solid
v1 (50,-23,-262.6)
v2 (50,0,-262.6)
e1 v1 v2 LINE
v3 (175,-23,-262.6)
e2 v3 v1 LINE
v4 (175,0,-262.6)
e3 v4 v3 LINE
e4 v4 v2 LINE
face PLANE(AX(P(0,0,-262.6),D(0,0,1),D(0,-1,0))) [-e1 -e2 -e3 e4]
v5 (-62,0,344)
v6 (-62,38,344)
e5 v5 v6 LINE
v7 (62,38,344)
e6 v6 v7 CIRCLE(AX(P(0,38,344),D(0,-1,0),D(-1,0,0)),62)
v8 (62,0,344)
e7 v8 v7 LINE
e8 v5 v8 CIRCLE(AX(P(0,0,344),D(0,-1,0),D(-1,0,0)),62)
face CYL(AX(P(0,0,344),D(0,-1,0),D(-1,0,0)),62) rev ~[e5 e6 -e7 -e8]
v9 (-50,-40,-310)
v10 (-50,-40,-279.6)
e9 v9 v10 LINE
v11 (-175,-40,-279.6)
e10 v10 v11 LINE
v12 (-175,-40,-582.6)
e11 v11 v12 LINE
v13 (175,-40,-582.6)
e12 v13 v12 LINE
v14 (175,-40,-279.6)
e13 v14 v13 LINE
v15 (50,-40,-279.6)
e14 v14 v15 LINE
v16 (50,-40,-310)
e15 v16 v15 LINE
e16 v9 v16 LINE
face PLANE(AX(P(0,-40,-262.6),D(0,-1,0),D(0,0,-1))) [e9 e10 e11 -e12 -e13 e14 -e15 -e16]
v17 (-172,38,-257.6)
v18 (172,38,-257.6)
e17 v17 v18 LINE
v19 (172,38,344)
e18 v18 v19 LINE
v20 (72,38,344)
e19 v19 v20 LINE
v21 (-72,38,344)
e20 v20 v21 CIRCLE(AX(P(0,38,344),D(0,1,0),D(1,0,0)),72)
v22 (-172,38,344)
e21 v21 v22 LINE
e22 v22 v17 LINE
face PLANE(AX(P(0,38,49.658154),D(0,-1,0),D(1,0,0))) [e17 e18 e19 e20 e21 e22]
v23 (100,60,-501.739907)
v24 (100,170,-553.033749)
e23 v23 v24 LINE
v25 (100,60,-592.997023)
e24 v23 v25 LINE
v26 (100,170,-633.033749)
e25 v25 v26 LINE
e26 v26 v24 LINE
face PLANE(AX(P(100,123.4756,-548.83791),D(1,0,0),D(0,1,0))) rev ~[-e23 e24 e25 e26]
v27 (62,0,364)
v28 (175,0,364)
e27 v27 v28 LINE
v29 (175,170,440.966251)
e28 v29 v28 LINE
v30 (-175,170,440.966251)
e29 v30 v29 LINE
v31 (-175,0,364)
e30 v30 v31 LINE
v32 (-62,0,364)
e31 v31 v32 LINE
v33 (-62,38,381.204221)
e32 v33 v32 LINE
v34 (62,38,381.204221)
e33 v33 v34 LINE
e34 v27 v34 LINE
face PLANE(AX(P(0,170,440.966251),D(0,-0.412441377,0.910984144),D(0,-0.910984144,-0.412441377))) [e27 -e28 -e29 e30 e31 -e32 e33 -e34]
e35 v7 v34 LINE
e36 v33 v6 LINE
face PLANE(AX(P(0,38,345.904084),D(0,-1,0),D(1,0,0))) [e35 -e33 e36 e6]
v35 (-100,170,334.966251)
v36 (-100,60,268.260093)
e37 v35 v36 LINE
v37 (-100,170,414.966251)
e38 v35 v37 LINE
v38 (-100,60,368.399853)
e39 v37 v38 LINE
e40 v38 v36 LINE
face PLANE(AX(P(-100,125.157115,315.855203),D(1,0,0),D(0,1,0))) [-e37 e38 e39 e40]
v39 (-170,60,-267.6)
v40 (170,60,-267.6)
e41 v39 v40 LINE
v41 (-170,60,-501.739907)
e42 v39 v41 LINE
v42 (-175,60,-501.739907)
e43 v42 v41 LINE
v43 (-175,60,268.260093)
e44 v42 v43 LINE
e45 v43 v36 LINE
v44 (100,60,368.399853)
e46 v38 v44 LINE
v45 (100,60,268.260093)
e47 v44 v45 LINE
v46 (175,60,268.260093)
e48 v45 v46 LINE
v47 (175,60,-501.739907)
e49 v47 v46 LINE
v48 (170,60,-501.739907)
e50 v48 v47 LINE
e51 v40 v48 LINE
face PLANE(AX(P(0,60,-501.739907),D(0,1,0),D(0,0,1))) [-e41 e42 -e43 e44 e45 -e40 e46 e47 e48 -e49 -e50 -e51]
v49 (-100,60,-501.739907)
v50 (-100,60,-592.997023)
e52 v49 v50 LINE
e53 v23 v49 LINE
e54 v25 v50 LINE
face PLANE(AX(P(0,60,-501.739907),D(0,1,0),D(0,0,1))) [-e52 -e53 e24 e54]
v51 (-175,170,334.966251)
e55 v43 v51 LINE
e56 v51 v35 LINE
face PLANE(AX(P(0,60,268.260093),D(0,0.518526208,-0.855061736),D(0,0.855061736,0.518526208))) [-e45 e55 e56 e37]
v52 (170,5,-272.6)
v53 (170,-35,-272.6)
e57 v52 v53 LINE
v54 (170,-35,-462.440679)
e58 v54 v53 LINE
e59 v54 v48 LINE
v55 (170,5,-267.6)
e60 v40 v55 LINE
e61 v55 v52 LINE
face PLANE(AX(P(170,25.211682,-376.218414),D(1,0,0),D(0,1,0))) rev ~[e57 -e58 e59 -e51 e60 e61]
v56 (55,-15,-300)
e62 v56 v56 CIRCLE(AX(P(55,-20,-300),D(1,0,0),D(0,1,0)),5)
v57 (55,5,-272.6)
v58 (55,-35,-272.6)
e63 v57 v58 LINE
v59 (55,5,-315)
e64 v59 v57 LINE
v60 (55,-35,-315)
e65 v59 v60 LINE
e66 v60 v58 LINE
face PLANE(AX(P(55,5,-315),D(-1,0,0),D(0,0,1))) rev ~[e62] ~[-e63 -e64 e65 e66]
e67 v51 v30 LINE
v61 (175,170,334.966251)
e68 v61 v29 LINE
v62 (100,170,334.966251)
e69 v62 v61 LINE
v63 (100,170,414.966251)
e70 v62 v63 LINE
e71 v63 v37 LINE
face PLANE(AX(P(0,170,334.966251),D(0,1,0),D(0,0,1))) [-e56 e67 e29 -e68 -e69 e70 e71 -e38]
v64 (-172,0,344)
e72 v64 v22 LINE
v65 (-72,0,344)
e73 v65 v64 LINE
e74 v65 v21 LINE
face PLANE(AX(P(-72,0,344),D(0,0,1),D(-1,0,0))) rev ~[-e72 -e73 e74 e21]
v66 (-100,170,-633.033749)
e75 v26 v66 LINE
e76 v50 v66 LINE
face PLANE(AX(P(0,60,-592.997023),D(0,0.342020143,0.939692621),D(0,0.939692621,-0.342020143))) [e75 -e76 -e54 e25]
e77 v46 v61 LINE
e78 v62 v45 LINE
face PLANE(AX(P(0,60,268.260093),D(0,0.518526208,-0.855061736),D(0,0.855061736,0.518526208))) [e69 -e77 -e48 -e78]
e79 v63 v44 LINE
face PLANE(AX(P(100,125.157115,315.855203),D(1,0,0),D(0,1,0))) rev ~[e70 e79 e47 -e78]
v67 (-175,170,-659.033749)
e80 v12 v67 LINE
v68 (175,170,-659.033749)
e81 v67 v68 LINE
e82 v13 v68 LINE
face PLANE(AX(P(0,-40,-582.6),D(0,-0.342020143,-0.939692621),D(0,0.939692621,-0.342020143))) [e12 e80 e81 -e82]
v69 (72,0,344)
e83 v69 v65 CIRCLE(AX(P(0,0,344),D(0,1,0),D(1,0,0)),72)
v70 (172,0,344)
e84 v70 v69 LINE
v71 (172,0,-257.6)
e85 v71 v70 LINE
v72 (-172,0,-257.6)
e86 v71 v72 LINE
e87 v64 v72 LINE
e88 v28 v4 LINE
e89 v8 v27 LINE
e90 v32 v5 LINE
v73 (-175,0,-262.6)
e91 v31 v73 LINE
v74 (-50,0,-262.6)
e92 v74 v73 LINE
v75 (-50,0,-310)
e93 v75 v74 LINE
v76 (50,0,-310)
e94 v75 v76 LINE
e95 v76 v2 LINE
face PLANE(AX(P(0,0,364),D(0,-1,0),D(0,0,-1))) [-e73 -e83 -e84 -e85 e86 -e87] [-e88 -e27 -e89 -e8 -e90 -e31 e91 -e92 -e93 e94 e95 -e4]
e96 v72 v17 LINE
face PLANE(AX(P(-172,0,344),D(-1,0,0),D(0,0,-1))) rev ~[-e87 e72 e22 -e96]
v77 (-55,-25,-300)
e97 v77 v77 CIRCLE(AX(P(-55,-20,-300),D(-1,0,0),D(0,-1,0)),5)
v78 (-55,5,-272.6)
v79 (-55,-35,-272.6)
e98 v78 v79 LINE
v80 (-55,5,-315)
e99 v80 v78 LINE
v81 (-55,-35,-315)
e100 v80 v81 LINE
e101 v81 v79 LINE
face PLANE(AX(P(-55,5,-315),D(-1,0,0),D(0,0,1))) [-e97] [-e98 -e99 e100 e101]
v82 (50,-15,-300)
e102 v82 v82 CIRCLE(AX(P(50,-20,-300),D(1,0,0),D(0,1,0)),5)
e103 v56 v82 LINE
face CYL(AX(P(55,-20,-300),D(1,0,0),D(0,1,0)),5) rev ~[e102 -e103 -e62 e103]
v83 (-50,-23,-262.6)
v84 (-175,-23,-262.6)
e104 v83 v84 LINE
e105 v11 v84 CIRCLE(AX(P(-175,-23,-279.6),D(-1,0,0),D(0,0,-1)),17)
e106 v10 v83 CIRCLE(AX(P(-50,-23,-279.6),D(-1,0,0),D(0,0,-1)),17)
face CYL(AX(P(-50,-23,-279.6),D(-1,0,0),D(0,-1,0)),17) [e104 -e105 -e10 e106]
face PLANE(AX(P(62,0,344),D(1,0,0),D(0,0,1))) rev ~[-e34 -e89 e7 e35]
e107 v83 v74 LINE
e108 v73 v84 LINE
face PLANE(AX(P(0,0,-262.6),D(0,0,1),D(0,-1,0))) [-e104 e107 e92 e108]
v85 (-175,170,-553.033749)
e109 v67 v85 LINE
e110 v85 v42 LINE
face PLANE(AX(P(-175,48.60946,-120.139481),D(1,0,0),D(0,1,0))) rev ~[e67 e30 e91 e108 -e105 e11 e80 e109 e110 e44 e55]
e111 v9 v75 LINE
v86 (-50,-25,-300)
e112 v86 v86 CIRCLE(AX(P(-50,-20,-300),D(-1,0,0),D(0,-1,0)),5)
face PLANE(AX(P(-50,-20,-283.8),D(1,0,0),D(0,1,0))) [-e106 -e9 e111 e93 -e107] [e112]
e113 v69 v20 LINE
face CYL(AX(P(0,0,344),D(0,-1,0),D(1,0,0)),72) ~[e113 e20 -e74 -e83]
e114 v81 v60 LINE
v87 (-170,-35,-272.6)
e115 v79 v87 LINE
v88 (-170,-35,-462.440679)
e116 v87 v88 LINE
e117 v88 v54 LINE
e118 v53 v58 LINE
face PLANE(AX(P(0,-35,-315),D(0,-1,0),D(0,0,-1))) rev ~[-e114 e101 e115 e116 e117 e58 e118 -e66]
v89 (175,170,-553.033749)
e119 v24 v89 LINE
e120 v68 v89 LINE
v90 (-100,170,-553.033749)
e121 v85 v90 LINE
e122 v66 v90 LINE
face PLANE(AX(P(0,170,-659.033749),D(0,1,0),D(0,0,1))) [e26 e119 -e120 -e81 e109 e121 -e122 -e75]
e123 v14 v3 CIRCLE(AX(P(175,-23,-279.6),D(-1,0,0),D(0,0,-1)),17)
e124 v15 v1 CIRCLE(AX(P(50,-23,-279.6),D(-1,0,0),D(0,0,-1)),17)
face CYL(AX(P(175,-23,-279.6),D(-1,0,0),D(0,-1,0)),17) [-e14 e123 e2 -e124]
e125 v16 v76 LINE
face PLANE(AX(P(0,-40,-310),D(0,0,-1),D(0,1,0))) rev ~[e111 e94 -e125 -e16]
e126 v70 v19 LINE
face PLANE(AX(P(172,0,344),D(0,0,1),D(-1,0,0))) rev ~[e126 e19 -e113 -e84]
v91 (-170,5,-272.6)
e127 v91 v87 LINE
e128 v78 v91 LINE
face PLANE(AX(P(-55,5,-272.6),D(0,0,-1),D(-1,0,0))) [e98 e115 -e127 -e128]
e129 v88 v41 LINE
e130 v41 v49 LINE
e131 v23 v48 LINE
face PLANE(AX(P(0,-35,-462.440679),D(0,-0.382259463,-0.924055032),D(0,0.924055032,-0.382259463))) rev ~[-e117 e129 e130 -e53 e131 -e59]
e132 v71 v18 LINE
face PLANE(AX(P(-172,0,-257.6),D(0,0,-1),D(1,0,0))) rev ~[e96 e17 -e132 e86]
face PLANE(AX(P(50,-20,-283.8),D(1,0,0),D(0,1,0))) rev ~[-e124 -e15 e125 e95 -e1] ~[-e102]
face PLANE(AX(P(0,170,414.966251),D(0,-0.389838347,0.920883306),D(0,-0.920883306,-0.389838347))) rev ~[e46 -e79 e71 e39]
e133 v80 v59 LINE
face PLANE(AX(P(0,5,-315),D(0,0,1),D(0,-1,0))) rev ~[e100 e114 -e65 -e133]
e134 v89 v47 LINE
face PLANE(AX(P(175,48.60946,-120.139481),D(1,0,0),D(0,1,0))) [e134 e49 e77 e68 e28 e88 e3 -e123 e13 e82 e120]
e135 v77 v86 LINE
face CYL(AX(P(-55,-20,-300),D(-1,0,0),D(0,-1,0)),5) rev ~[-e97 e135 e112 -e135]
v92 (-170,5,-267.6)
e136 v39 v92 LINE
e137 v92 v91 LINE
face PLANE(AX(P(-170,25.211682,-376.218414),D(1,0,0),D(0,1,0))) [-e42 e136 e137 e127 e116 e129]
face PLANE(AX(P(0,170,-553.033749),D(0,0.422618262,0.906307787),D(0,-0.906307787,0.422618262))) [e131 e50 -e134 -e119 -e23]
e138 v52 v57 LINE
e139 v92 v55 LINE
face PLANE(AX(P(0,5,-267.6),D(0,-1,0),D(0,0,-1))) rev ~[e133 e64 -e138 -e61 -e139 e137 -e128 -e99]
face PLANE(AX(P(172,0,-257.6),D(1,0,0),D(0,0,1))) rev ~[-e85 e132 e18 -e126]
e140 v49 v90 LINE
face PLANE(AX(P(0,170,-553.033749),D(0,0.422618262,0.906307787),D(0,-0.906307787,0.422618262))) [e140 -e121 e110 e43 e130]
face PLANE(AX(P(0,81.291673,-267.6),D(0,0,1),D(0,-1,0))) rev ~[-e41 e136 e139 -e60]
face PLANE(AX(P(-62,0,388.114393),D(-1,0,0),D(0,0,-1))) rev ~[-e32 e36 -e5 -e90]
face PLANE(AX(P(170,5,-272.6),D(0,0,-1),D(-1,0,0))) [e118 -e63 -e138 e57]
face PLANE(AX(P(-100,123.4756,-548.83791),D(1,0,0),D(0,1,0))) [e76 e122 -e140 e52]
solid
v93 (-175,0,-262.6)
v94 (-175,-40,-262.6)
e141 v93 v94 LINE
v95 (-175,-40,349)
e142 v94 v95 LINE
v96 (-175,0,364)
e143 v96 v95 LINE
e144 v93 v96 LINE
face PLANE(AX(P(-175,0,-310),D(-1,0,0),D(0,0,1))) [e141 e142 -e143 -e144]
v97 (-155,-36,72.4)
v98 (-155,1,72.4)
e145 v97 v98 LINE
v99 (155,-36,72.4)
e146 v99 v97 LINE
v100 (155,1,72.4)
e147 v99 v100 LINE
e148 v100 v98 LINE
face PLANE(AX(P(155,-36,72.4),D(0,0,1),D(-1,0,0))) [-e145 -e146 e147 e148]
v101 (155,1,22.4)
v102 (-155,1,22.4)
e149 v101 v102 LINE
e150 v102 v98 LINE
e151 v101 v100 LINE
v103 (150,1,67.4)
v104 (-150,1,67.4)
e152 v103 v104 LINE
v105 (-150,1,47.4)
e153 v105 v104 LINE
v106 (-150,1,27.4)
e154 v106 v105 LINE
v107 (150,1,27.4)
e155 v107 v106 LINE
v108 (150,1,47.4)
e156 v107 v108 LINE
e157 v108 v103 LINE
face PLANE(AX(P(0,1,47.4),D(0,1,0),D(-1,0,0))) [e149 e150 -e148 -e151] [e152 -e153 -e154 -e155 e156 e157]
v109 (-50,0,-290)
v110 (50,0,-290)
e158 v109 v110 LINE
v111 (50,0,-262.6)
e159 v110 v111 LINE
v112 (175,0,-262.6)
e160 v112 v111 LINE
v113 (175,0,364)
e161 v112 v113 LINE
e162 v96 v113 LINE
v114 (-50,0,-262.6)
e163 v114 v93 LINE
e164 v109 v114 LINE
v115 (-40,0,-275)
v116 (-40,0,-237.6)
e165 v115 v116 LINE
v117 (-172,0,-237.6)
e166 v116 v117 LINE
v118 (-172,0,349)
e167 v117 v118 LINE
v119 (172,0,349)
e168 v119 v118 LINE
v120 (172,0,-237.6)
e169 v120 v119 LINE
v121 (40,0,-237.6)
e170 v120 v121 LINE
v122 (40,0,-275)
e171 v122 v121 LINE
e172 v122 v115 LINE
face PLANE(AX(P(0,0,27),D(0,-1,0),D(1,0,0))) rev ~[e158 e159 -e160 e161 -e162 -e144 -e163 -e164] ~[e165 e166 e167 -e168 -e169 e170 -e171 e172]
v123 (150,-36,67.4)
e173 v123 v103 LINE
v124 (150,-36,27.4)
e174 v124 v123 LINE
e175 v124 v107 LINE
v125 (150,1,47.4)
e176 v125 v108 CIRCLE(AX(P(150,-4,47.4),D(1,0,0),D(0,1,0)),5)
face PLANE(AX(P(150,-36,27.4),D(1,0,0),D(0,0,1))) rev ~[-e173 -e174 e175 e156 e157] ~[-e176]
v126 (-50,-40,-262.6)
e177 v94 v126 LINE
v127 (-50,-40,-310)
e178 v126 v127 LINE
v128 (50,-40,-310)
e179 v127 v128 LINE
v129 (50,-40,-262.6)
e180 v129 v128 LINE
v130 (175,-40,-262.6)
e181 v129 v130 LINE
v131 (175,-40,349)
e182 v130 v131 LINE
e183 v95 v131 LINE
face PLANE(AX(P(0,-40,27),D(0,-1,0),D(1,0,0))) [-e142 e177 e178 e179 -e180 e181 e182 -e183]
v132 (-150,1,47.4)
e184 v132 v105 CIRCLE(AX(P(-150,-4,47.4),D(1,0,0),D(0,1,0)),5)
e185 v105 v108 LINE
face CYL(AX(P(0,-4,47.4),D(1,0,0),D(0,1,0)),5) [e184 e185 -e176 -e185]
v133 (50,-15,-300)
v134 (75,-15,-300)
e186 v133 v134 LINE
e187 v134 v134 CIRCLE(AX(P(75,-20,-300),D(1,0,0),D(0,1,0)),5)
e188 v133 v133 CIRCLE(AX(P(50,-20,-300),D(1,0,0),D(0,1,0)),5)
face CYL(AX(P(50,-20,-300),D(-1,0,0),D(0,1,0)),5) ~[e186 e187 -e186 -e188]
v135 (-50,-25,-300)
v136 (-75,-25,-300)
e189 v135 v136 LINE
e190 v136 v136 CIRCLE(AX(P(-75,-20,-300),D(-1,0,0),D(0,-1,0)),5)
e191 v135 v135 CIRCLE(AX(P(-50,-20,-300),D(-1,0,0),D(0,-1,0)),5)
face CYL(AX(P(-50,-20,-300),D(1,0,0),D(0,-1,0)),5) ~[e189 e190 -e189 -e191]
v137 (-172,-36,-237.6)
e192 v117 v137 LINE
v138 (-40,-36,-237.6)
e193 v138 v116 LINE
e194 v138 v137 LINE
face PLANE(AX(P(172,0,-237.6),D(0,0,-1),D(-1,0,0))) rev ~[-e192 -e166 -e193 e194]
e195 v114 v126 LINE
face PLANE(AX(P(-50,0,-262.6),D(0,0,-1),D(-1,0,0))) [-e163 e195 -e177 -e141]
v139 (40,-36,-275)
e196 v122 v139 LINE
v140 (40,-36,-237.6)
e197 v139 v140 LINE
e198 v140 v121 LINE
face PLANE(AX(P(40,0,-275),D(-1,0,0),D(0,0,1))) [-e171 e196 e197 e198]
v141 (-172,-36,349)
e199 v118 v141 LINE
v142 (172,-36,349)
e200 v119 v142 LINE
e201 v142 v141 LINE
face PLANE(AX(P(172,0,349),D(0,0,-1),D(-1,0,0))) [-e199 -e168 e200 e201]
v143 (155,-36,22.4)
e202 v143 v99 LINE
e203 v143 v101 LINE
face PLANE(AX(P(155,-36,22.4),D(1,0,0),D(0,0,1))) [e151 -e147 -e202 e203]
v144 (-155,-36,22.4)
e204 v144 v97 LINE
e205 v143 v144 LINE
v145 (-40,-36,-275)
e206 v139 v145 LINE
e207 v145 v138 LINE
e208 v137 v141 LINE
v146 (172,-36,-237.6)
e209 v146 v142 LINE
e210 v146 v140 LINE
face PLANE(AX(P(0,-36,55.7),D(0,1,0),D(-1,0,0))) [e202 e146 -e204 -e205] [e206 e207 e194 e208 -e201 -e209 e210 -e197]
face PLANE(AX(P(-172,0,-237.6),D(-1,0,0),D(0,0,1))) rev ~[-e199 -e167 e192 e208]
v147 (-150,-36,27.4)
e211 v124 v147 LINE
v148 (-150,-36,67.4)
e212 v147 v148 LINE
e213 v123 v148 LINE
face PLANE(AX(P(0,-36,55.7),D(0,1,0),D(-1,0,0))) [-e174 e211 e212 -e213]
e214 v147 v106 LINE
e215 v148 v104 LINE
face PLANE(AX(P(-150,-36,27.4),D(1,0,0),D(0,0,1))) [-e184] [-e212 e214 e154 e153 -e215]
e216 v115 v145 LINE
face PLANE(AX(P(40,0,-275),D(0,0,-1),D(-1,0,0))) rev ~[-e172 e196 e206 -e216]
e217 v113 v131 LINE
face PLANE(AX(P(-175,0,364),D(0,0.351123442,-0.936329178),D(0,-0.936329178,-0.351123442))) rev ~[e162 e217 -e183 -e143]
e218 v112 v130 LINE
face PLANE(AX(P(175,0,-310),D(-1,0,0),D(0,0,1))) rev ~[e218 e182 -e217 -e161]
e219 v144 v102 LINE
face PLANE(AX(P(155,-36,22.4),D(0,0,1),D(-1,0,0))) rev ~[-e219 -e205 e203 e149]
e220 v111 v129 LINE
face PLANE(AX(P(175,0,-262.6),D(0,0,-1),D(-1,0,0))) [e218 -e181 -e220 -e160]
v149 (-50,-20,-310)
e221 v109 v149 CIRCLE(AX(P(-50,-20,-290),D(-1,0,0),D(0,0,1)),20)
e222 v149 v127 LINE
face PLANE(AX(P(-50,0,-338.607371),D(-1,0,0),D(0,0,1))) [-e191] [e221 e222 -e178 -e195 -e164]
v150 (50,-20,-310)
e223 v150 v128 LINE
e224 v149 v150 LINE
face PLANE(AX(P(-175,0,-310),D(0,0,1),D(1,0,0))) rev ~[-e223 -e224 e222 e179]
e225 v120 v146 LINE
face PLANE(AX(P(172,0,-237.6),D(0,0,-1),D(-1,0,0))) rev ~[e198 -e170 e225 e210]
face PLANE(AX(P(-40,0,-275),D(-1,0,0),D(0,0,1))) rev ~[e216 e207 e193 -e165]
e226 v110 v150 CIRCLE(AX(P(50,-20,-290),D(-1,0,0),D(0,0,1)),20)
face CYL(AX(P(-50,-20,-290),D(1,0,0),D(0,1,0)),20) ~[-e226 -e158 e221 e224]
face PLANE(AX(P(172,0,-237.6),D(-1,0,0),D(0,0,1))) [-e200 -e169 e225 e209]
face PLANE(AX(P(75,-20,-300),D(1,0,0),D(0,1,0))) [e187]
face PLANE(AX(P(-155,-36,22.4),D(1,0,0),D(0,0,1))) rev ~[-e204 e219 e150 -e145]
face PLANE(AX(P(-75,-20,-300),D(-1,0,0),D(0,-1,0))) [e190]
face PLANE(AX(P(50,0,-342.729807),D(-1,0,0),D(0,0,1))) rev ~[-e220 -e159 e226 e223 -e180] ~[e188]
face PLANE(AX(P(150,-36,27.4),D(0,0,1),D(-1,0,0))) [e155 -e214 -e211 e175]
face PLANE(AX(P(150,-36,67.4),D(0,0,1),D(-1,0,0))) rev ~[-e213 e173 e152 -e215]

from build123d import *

# Parameters (mm, degrees)
F0_W      = 350
F0_H      = 674
F1_DEPTH  = 40
F2_W      = 344
F2_H      = 586.6
F3_DEPTH  = 36
F4_W      = 310
F4_H      = 50
F4_W_2    = 300
F4_H_2    = 40
F5_DEPTH  = 37
F6_R      = 5
F7_DEPTH  = 150
F8_W      = 125
F8_H      = 80.1298069
F8_H_2    = 76.0073708534
F9_DEPTH  = 40.001
F10_R     = 20
F11_R     = 5
F12_DEPTH = 25
F13_R     = 5
F14_DEPTH = 25
F16_DEPTH = 350.001
F17_W     = 80
F17_H     = 79.4738833577
F18_DEPTH = 36
F20_DEPTH = 175
F22_DEPTH = 38
F24_DEPTH = 38
F26_DEPTH = 100
F27_W     = 40
F27_H     = 52.4
F28_DEPTH = 50
F30_DEPTH = 170
F31_W     = 115
F31_H     = 42.4
F32_DEPTH = 40
F33_R     = 5
F34_DEPTH = 5
F35_R     = 5
F36_DEPTH = 5
F37_R     = 17


with BuildPart() as f1:
    # F0 (on Front) → F1 (new body)
    with BuildSketch(Plane.XZ):
        with Locations((0, 27)):
            Rectangle(F0_W, F0_H)
    extrude(amount=F1_DEPTH)

    # F2 (on face) → F3 (cut)
    with BuildSketch(Plane(origin=(0, 0, 0), x_dir=(-1, 0, 0), z_dir=(0, 1, 0))):
        with Locations((0, 55.7)):
            Rectangle(F2_W, F2_H)
    extrude(amount=-F3_DEPTH, mode=Mode.SUBTRACT)

    # F4 (on face) → F5 (join)
    with BuildSketch(Plane(origin=(0, -36, 0), x_dir=(-1, 0, 0), z_dir=(0, 1, 0))):
        with Locations((0, 47.4)):
            Rectangle(F4_W, F4_H)
        with Locations((0, 47.4)):
            Rectangle(F4_W_2, F4_H_2, mode=Mode.SUBTRACT)
    extrude(amount=F5_DEPTH)

    # F6 (on Right) → F7 (join, symmetric)
    with BuildSketch(Plane.YZ):
        with Locations((-4, 47.4)):
            Circle(F6_R)
    extrude(amount=F7_DEPTH, both=True)

    # F8 (on face) → F9 (cut, through all)
    with BuildSketch(Plane(origin=(0, 0, 0), x_dir=(-1, 0, 0), z_dir=(0, 1, 0))):
        with Locations((-112.5, -302.66490345)):
            Rectangle(F8_W, F8_H)
        with Locations((112.5, -300.6036854267)):
            Rectangle(F8_W, F8_H_2)
    extrude(amount=-F9_DEPTH, mode=Mode.SUBTRACT)

    # F10
    f10_edges = [f1.edges().sort_by_distance(p)[0] for p in [
        (0, 0, -310),
    ]]
    fillet(f10_edges, radius=F10_R)

    # F11 (on face) → F12 (join)
    with BuildSketch(Plane.YZ.offset(50)):
        with Locations((-20, -300)):
            Circle(F11_R)
    extrude(amount=F12_DEPTH)

    # F13 (on face) → F14 (join)
    with BuildSketch(Plane(origin=(-50, 0, 0), x_dir=(0, -1, 0), z_dir=(-1, 0, 0))):
        with Locations((20, -300)):
            Circle(F13_R)
    extrude(amount=F14_DEPTH)

    # F15 (on face) → F16 (cut, through all)
    with BuildSketch(Plane(origin=(-175, 0, 0), x_dir=(0, -1, 0), z_dir=(-1, 0, 0))):
        Polygon((40, 364), (0, 364), (40, 349), align=None)
    extrude(amount=-F16_DEPTH, mode=Mode.SUBTRACT)

    # F17 (on face) → F18 (cut, through all)
    with BuildSketch(Plane(origin=(0, 0, 0), x_dir=(-1, 0, 0), z_dir=(0, 1, 0))):
        with Locations((0, -235.2630583211)):
            Rectangle(F17_W, F17_H)
    extrude(amount=-F18_DEPTH, mode=Mode.SUBTRACT)


with BuildPart() as f20:
    # F19 (on Right) → F20 (new body, symmetric)
    with BuildSketch(Plane.YZ):
        Polygon((-40, -582.6), (170, -659.0337491959), (170, -553.0337491959), (60, -501.7399067989), (60, 268.2600932011), (170, 334.9662508041), (170, 440.9662508041), (0, 364), (0, -262.6), (-40, -262.6), align=None)
    extrude(amount=F20_DEPTH, both=True)

    # F21 (on face) → F22 (cut)
    with BuildSketch(Plane.XZ):
        with BuildLine():
            Line((-72, 344), (-172, 344))
            Line((-172, 344), (-172, -257.6))
            Line((-172, -257.6), (172, -257.6))
            Line((172, -257.6), (172, 344))
            Line((172, 344), (72, 344))
            ThreePointArc((72, 344), (0, 272), (-72, 344))
        make_face()
    extrude(amount=-F22_DEPTH, mode=Mode.SUBTRACT)

    # F23 (on face) → F24 (cut)
    with BuildSketch(Plane.XZ):
        with BuildLine():
            Line((-62, 388.1143927574), (-62, 344))
            ThreePointArc((-62, 344), (0, 282), (62, 344))
            Line((62, 344), (62, 388.1143927574))
            Line((62, 388.1143927574), (-62, 388.1143927574))
        make_face()
    extrude(amount=-F24_DEPTH, mode=Mode.SUBTRACT)

    # F25 (on Right) → F26 (cut, symmetric)
    with BuildSketch(Plane.YZ):
        Polygon((170, -633.0337491959), (170, -553.0337491959), (170, -466.1389887333), (60, -501.7399067989), (60, -592.9970234266), align=None)
        Polygon((170, 334.9662508041), (170, 414.9662508041), (60, 368.399853225), (60, 268.2600932011), (170, 214.6935015917), align=None)
    extrude(amount=F26_DEPTH, both=True, mode=Mode.SUBTRACT)

    # F27 (on Right) → F28 (cut, symmetric)
    with BuildSketch(Plane.YZ):
        with Locations((-20, -283.8)):
            Rectangle(F27_W, F27_H)
    extrude(amount=F28_DEPTH, both=True, mode=Mode.SUBTRACT)

    # F29 (on Right) → F30 (cut, symmetric)
    with BuildSketch(Plane.YZ):
        Polygon((81.2916728854, -267.6), (5, -267.6), (5, -315), (-35, -315), (-35, -462.4406792741), (60, -501.7399067989), (81.2916728854, -331.8917108536), align=None)
    extrude(amount=F30_DEPTH, both=True, mode=Mode.SUBTRACT)

    # F31 (on face) → F32 (cut, through all)
    with BuildSketch(Plane(origin=(0, 5, 0), x_dir=(-1, 0, 0), z_dir=(0, 1, 0))):
        with Locations((-112.5, -293.8)):
            Rectangle(F31_W, F31_H)
        with Locations((112.5, -293.8)):
            Rectangle(F31_W, F31_H)
    extrude(amount=-F32_DEPTH, mode=Mode.SUBTRACT)

    # F33 (on face) → F34 (cut)
    with BuildSketch(Plane.YZ.offset(55)):
        with Locations((-20, -300)):
            Circle(F33_R)
    extrude(amount=-F34_DEPTH, mode=Mode.SUBTRACT)

    # F35 (on face) → F36 (cut)
    with BuildSketch(Plane(origin=(-55, 0, 0), x_dir=(0, -1, 0), z_dir=(-1, 0, 0))):
        with Locations((20, -300)):
            Circle(F35_R)
    extrude(amount=-F36_DEPTH, mode=Mode.SUBTRACT)

    # F37
    f37_edges = [f20.edges().sort_by_distance(p)[0] for p in [
        (-112.5, -40, -262.6),
        (112.5, -40, -262.6),
    ]]
    fillet(f37_edges, radius=F37_R)


solid = Compound([f1.part, f20.part])
